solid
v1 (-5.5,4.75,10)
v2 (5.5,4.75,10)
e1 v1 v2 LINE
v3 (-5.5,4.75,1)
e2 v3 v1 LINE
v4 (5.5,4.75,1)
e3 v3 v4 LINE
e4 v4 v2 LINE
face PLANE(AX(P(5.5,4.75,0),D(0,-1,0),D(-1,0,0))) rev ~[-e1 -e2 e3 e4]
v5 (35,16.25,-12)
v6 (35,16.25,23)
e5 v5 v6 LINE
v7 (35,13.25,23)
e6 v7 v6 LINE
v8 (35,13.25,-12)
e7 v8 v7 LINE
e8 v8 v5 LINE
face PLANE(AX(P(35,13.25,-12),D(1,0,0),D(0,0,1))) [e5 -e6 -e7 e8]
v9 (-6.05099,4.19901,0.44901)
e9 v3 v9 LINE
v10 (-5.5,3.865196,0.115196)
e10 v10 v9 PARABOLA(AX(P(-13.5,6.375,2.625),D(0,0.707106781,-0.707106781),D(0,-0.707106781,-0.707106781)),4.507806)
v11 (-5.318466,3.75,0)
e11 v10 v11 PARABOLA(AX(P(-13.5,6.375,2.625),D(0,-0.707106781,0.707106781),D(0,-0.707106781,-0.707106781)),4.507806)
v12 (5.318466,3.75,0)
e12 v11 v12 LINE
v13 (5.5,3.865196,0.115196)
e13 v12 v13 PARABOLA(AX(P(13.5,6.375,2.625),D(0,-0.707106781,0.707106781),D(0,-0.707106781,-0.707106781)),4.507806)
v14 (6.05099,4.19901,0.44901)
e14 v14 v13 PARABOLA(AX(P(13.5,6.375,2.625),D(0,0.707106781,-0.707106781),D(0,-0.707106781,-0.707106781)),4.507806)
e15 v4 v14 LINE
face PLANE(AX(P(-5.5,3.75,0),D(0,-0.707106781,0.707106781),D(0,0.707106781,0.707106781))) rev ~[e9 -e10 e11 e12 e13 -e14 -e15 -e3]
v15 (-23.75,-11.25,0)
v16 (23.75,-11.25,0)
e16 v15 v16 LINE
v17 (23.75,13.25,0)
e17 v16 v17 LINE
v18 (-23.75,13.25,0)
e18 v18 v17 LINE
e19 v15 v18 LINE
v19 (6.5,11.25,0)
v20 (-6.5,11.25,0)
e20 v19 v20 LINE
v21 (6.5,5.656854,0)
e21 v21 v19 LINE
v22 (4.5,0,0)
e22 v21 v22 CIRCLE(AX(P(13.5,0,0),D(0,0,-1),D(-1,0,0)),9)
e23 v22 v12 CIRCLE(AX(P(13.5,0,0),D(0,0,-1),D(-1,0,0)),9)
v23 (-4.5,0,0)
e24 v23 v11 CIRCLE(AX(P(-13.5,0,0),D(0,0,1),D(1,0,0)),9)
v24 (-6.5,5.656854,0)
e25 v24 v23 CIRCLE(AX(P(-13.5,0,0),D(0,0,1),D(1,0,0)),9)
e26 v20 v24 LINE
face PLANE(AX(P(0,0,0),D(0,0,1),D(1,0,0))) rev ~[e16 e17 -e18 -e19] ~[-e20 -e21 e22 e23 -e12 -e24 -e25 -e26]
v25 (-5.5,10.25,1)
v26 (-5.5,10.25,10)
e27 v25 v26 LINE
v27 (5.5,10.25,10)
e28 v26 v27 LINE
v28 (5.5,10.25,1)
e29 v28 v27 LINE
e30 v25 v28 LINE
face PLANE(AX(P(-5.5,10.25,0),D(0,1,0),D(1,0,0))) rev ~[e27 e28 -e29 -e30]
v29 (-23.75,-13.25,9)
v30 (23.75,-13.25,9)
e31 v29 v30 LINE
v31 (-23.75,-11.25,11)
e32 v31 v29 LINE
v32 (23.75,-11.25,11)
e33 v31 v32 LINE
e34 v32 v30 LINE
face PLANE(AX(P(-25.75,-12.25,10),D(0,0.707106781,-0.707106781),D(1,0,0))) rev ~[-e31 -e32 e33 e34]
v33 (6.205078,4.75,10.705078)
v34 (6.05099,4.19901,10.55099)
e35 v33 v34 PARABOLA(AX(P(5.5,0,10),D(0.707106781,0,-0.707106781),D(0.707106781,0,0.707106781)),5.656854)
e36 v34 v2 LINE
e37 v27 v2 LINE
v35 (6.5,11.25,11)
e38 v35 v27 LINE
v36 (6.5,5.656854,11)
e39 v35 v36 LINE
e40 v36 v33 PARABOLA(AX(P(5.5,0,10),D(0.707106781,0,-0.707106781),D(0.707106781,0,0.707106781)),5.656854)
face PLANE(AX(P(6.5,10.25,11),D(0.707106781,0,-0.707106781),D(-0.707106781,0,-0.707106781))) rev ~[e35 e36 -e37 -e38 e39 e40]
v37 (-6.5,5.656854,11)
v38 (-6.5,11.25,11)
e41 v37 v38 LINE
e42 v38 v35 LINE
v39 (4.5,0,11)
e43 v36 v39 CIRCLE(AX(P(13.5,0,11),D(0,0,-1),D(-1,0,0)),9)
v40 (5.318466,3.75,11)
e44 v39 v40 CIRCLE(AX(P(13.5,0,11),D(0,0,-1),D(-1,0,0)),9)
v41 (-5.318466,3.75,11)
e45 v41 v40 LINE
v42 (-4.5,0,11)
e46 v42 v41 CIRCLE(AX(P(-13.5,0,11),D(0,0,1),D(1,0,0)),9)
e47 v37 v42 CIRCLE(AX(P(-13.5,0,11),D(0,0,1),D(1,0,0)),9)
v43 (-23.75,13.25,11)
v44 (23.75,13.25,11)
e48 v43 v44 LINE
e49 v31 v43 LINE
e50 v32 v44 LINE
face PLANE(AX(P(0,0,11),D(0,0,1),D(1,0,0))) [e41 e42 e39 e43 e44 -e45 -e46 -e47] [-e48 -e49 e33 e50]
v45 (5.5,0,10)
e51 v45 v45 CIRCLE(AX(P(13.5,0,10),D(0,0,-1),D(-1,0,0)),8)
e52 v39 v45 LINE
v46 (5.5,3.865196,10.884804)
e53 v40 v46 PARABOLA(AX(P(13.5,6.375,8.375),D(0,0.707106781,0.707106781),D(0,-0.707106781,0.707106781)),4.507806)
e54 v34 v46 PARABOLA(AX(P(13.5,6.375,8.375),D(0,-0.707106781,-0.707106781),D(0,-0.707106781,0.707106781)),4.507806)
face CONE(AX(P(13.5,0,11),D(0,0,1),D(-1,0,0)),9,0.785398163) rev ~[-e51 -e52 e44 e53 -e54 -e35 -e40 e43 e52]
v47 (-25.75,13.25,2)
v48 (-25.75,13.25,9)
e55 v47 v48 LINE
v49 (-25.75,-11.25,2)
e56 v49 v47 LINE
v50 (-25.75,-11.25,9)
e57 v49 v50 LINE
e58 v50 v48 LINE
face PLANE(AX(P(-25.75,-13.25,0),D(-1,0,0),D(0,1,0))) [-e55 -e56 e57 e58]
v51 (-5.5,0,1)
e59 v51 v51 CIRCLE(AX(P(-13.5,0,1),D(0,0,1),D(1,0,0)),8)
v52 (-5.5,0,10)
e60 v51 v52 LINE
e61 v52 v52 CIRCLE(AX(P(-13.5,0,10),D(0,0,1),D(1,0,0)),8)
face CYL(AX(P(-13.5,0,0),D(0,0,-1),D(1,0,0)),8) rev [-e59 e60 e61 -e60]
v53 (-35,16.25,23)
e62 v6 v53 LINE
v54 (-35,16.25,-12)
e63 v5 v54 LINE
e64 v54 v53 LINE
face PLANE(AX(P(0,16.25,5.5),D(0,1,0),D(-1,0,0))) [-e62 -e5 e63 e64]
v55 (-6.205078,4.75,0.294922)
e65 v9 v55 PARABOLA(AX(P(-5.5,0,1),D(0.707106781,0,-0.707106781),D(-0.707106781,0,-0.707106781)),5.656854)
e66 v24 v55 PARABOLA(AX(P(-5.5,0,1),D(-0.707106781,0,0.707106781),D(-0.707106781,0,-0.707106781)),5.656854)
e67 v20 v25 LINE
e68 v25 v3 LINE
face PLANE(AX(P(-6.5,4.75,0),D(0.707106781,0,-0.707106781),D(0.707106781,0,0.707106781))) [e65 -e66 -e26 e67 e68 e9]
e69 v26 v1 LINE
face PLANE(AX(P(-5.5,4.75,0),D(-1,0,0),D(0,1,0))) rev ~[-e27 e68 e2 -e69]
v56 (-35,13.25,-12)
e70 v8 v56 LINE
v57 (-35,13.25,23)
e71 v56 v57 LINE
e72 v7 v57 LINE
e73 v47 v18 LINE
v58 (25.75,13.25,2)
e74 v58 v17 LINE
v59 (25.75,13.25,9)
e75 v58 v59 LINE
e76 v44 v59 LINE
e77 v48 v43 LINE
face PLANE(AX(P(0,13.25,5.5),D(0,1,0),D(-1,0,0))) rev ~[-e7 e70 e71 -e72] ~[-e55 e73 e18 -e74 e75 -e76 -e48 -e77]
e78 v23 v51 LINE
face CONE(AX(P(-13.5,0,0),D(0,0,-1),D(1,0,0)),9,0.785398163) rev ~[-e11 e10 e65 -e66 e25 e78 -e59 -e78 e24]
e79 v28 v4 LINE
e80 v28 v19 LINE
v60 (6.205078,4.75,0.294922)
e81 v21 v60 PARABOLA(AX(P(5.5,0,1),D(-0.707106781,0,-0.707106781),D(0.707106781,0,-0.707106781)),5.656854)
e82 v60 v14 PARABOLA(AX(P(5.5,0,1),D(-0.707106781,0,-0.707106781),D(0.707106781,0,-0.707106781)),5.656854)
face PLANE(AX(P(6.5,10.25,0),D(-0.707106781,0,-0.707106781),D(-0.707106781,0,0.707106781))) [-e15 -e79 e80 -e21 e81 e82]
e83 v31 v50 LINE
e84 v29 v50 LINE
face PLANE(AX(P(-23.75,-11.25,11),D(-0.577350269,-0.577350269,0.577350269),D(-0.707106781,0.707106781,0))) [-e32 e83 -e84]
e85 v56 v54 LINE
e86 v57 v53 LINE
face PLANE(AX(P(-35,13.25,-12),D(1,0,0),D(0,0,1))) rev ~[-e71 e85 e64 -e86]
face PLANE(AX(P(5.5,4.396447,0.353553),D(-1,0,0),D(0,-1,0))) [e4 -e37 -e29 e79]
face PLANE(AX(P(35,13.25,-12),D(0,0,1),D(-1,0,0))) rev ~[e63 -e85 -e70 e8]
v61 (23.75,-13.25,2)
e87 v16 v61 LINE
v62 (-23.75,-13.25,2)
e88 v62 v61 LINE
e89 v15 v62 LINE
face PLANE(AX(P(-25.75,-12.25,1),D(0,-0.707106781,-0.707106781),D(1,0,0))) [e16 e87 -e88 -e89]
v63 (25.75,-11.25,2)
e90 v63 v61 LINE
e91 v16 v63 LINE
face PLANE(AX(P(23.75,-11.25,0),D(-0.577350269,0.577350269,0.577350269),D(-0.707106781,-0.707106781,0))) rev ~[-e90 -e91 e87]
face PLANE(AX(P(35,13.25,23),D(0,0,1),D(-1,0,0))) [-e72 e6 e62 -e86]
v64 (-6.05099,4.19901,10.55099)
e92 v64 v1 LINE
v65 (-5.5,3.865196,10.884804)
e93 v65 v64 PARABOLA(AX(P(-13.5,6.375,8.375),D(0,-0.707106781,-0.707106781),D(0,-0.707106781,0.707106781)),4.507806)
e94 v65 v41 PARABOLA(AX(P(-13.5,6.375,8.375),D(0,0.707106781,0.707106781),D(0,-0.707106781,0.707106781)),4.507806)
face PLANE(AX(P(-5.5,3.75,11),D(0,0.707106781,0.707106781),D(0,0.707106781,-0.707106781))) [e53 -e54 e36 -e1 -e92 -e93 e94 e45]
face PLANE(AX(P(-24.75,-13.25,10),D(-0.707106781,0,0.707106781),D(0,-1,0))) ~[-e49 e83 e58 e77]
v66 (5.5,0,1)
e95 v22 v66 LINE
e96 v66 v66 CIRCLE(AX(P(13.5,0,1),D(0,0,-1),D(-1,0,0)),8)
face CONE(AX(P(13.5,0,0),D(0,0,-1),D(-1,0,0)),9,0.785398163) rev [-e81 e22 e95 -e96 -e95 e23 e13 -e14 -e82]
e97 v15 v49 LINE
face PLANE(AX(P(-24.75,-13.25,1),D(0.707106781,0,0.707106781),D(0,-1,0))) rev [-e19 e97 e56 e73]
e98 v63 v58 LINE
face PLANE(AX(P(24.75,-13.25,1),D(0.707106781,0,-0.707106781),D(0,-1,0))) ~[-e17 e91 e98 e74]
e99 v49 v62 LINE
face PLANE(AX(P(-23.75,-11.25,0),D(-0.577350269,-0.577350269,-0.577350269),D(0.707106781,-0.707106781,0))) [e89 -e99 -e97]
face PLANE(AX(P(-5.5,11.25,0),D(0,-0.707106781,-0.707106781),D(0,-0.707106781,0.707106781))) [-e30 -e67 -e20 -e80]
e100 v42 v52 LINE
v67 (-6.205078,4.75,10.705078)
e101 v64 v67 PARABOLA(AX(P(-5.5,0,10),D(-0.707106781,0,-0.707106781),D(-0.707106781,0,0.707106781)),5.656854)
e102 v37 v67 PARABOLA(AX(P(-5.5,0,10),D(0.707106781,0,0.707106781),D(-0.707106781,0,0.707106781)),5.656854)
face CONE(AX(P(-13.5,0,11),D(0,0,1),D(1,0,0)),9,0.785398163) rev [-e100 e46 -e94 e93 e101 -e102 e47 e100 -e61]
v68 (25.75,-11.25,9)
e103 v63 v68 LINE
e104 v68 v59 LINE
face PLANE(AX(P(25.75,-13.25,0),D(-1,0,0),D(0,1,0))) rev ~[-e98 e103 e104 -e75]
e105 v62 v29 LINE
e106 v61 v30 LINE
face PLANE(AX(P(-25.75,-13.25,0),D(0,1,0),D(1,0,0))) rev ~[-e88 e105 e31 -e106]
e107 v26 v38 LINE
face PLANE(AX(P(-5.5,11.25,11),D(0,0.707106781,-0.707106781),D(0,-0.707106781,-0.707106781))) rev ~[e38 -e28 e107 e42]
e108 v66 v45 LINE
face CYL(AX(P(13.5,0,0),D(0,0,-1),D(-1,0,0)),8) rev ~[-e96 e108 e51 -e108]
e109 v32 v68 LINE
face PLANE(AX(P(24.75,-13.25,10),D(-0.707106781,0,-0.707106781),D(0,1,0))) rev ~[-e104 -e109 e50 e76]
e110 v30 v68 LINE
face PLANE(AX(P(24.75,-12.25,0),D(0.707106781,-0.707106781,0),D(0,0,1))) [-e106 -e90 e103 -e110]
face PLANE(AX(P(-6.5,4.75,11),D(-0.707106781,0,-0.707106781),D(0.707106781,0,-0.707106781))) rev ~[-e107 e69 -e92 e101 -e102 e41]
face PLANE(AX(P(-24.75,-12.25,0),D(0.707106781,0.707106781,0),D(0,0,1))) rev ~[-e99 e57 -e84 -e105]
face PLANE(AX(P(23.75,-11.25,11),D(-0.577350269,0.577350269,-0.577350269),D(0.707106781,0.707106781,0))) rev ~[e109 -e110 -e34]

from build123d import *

# Parameters (mm, degrees)
F0_W         = 51.5
F0_H         = 26.5
F0_R         = 8
F1_DEPTH     = 11
F2_W         = 70
F2_H         = 35
F2_W_2       = 25.75
F2_H_2       = 11
F3_DEPTH     = 3
F4_SIZE      = 2
F5_T1_DEPTH  = 11
F5_T3_DEPTH  = 5.5
F5_T17_DEPTH = 8.071682988
F5_T21_DEPTH = 13.571682988
F5_T28_DEPTH = 13.571682988
F5_T32_DEPTH = 8.071682988
F5_T39_DEPTH = 13.571682988
F5_T43_DEPTH = 8.071682988
F5_T50_DEPTH = 13.571682988
F5_T54_DEPTH = 8.071682988
F5_T61_DEPTH = 8.071682988
F5_T65_DEPTH = 13.571682988
F5_T72_DEPTH = 13.571682988
F5_T76_DEPTH = 8.071682988
F5_T83_DEPTH = 13.571682988
F5_T87_DEPTH = 8.071682988
F5_T94_DEPTH = 13.571682988
F5_T98_DEPTH = 8.071682988


# Not quite as in the source:
# - a fillet or chamfer that OpenCascade refuses, or shapes differently, is made with other operations: its cross-section is extruded or revolved along the edge and cut away or added


with BuildPart() as f1:
    # F0 (on Top) → F1 (new body)
    with BuildSketch(Plane.XY):
        Rectangle(F0_W, F0_H)
        Polygon((5.5, 10.25), (22.75, 10.25), (22.75, -10.25), (-22.75, -10.25), (-22.75, 10.25), (-5.5, 10.25), align=None, mode=Mode.SUBTRACT)
        Polygon((22.75, -10.25), (22.75, 10.25), (5.5, 10.25), (5.5, 4.75), (-5.5, 4.75), (-5.5, 10.25), (-22.75, 10.25), (-22.75, -10.25), align=None)
        with Locations((-13.5, 0)):
            Circle(F0_R, mode=Mode.SUBTRACT)
        with BuildLine():
            ThreePointArc((21.5, 0), (13.5, -8), (5.5, 0))
            ThreePointArc((5.5, 0), (13.5, 8), (21.5, 0))
        make_face(mode=Mode.SUBTRACT)
    extrude(amount=F1_DEPTH)

    # F2 (on face) → F3 (join)
    with BuildSketch(Plane(origin=(0, 13.25, 0), x_dir=(-1, 0, 0), z_dir=(0, 1, 0))):
        with Locations((0, 5.5)):
            Rectangle(F2_W, F2_H)
        Polygon((25.75, 0), (0, 0), (-25.75, 0), (-25.75, 11), (0, 11), (25.75, 11), align=None, mode=Mode.SUBTRACT)
        with Locations((-12.875, 5.5)):
            Rectangle(F2_W_2, F2_H_2)
        with Locations((12.875, 5.5)):
            Rectangle(F2_W_2, F2_H_2)
    extrude(amount=F3_DEPTH)

    # F4
    f4_edges = [f1.edges().sort_by_distance(p)[0] for p in [
        (-25.75, -13.25, 5.5),
        (25.75, -13.25, 5.5),
        (0, -13.25, 11),
        (25.75, 0, 11),
        (-25.75, 0, 11),
        (25.75, 0, 0),
        (-25.75, 0, 0),
        (0, -13.25, 0),
    ]]
    chamfer(f4_edges, length=F4_SIZE)

    # F5: chamfer of 1 on 12 edges, made by hand

    # F5_s2 → F5_t1 (cut)
    with BuildSketch(Plane.YZ.offset(-5.5)):
        Polygon((3.75, 0), (4.75, 1), (4.75, 0), align=None)
        Polygon((11.25, 0), (10.25, 1), (10.25, 0), align=None)
        Polygon((3.75, 11), (4.75, 10), (4.75, 11), align=None)
        Polygon((11.25, 11), (10.25, 10), (10.25, 11), align=None)
    extrude(amount=F5_T1_DEPTH, mode=Mode.SUBTRACT)

    # F5_s4 → F5_t3 (cut)
    with BuildSketch(Plane.XZ.offset(-10.25)):
        Polygon((6.5, 0), (5.5, 1), (5.5, 0), align=None)
        Polygon((-6.5, 0), (-5.5, 1), (-5.5, 0), align=None)
        Polygon((-6.5, 11), (-5.5, 10), (-5.5, 11), align=None)
        Polygon((6.5, 11), (5.5, 10), (5.5, 11), align=None)
    extrude(amount=F5_T3_DEPTH, mode=Mode.SUBTRACT)

    # F5_s5 → F5_t6 (revolve, cut)
    with BuildSketch(Plane.XZ):
        Polygon((-4.5, 0), (-5.5, 1), (-5.5, 0), align=None)
    revolve(axis=Axis((-13.5, 0, 0), (0, 0, 1)), mode=Mode.SUBTRACT)

    # F5_s7 → F5_t8 (revolve, cut)
    with BuildSketch(Plane.XZ):
        Polygon((4.5, 0), (5.5, 1), (5.5, 0), align=None)
    revolve(axis=Axis((13.5, 0, 0), (0, 0, -1)), mode=Mode.SUBTRACT)

    # F5_s9 → F5_t10 (revolve, cut)
    with BuildSketch(Plane.XZ):
        Polygon((-4.5, 11), (-5.5, 10), (-5.5, 11), align=None)
    revolve(axis=Axis((-13.5, 0, 11), (0, 0, 1)), mode=Mode.SUBTRACT)

    # F5_s11 → F5_t12 (revolve, cut)
    with BuildSketch(Plane.XZ):
        Polygon((4.5, 11), (5.5, 10), (5.5, 11), align=None)
    revolve(axis=Axis((13.5, 0, 11), (0, 0, -1)), mode=Mode.SUBTRACT)


with BuildPart() as f5_tool15:
    # F5_s16 → F5_t17 (new body)
    with BuildSketch(Plane.XZ.offset(-10.25)):
        Polygon((6.5, 0), (5.5, 1), (5.5, 0), align=None)
    extrude(amount=F5_T17_DEPTH)

    split(bisect_by=Plane.XZ.offset(-4.75), keep=Keep.TOP)


with BuildPart() as f5_tool19:
    # F5_s20 → F5_t21 (new body)
    with BuildSketch(Plane.YZ.offset(8.071682988)):
        Polygon((3.75, 0), (4.75, 1), (4.75, 0), align=None)
    extrude(amount=-F5_T21_DEPTH)

    split(bisect_by=Plane.YZ.offset(5.5), keep=Keep.TOP)


with BuildPart() as f5_tool15_1:
    add(f5_tool15.part)

    # F5_t23: intersect F5_tool19
    add(f5_tool19.part, mode=Mode.INTERSECT)


with BuildPart() as f1_1:
    add(f1.part)

    # F5_t13: cut F5_tool15
    add(f5_tool15_1.part, mode=Mode.SUBTRACT)


with BuildPart() as f5_tool26:
    # F5_s27 → F5_t28 (new body)
    with BuildSketch(Plane.YZ.offset(5.5)):
        Polygon((3.75, 0), (4.75, 1), (4.75, 0), align=None)
    extrude(amount=-F5_T28_DEPTH)

    split(bisect_by=Plane.YZ.offset(-5.5), keep=Keep.BOTTOM)


with BuildPart() as f5_tool30:
    # F5_s31 → F5_t32 (new body)
    with BuildSketch(Plane.XZ.offset(-2.178317012)):
        Polygon((-6.5, 0), (-5.5, 1), (-5.5, 0), align=None)
    extrude(amount=-F5_T32_DEPTH)

    split(bisect_by=Plane.XZ.offset(-4.75), keep=Keep.TOP)


with BuildPart() as f5_tool26_1:
    add(f5_tool26.part)

    # F5_t34: intersect F5_tool30
    add(f5_tool30.part, mode=Mode.INTERSECT)


with BuildPart() as f1_2:
    add(f1_1.part)

    # F5_t24: cut F5_tool26
    add(f5_tool26_1.part, mode=Mode.SUBTRACT)


with BuildPart() as f5_tool37:
    # F5_s38 → F5_t39 (new body)
    with BuildSketch(Plane.YZ.offset(-5.5)):
        Polygon((11.25, 0), (10.25, 1), (10.25, 0), align=None)
    extrude(amount=F5_T39_DEPTH)

    split(bisect_by=Plane.YZ.offset(5.5), keep=Keep.TOP)


with BuildPart() as f5_tool41:
    # F5_s42 → F5_t43 (new body)
    with BuildSketch(Plane.XZ.offset(-12.821682988)):
        Polygon((6.5, 0), (5.5, 1), (5.5, 0), align=None)
    extrude(amount=F5_T43_DEPTH)

    split(bisect_by=Plane.XZ.offset(-10.25), keep=Keep.BOTTOM)


with BuildPart() as f5_tool37_1:
    add(f5_tool37.part)

    # F5_t45: intersect F5_tool41
    add(f5_tool41.part, mode=Mode.INTERSECT)


with BuildPart() as f1_3:
    add(f1_2.part)

    # F5_t35: cut F5_tool37
    add(f5_tool37_1.part, mode=Mode.SUBTRACT)


with BuildPart() as f5_tool48:
    # F5_s49 → F5_t50 (new body)
    with BuildSketch(Plane.YZ.offset(-8.071682988)):
        Polygon((11.25, 0), (10.25, 1), (10.25, 0), align=None)
    extrude(amount=F5_T50_DEPTH)

    split(bisect_by=Plane.YZ.offset(-5.5), keep=Keep.BOTTOM)


with BuildPart() as f5_tool52:
    # F5_s53 → F5_t54 (new body)
    with BuildSketch(Plane.XZ.offset(-4.75)):
        Polygon((-6.5, 0), (-5.5, 1), (-5.5, 0), align=None)
    extrude(amount=-F5_T54_DEPTH)

    split(bisect_by=Plane.XZ.offset(-10.25), keep=Keep.BOTTOM)


with BuildPart() as f5_tool48_1:
    add(f5_tool48.part)

    # F5_t56: intersect F5_tool52
    add(f5_tool52.part, mode=Mode.INTERSECT)


with BuildPart() as f1_4:
    add(f1_3.part)

    # F5_t46: cut F5_tool48
    add(f5_tool48_1.part, mode=Mode.SUBTRACT)


with BuildPart() as f5_tool59:
    # F5_s60 → F5_t61 (new body)
    with BuildSketch(Plane.XZ.offset(-10.25)):
        Polygon((6.5, 11), (5.5, 10), (5.5, 11), align=None)
    extrude(amount=F5_T61_DEPTH)

    split(bisect_by=Plane.XZ.offset(-4.75), keep=Keep.TOP)


with BuildPart() as f5_tool63:
    # F5_s64 → F5_t65 (new body)
    with BuildSketch(Plane.YZ.offset(8.071682988)):
        Polygon((3.75, 11), (4.75, 10), (4.75, 11), align=None)
    extrude(amount=-F5_T65_DEPTH)

    split(bisect_by=Plane.YZ.offset(5.5), keep=Keep.TOP)


with BuildPart() as f5_tool59_1:
    add(f5_tool59.part)

    # F5_t67: intersect F5_tool63
    add(f5_tool63.part, mode=Mode.INTERSECT)


with BuildPart() as f1_5:
    add(f1_4.part)

    # F5_t57: cut F5_tool59
    add(f5_tool59_1.part, mode=Mode.SUBTRACT)


with BuildPart() as f5_tool70:
    # F5_s71 → F5_t72 (new body)
    with BuildSketch(Plane.YZ.offset(5.5)):
        Polygon((3.75, 11), (4.75, 10), (4.75, 11), align=None)
    extrude(amount=-F5_T72_DEPTH)

    split(bisect_by=Plane.YZ.offset(-5.5), keep=Keep.BOTTOM)


with BuildPart() as f5_tool74:
    # F5_s75 → F5_t76 (new body)
    with BuildSketch(Plane.XZ.offset(-2.178317012)):
        Polygon((-6.5, 11), (-5.5, 10), (-5.5, 11), align=None)
    extrude(amount=-F5_T76_DEPTH)

    split(bisect_by=Plane.XZ.offset(-4.75), keep=Keep.TOP)


with BuildPart() as f5_tool70_1:
    add(f5_tool70.part)

    # F5_t78: intersect F5_tool74
    add(f5_tool74.part, mode=Mode.INTERSECT)


with BuildPart() as f1_6:
    add(f1_5.part)

    # F5_t68: cut F5_tool70
    add(f5_tool70_1.part, mode=Mode.SUBTRACT)


with BuildPart() as f5_tool81:
    # F5_s82 → F5_t83 (new body)
    with BuildSketch(Plane.YZ.offset(-8.071682988)):
        Polygon((11.25, 11), (10.25, 10), (10.25, 11), align=None)
    extrude(amount=F5_T83_DEPTH)

    split(bisect_by=Plane.YZ.offset(-5.5), keep=Keep.BOTTOM)


with BuildPart() as f5_tool85:
    # F5_s86 → F5_t87 (new body)
    with BuildSketch(Plane.XZ.offset(-4.75)):
        Polygon((-6.5, 11), (-5.5, 10), (-5.5, 11), align=None)
    extrude(amount=-F5_T87_DEPTH)

    split(bisect_by=Plane.XZ.offset(-10.25), keep=Keep.BOTTOM)


with BuildPart() as f5_tool81_1:
    add(f5_tool81.part)

    # F5_t89: intersect F5_tool85
    add(f5_tool85.part, mode=Mode.INTERSECT)


with BuildPart() as f1_7:
    add(f1_6.part)

    # F5_t79: cut F5_tool81
    add(f5_tool81_1.part, mode=Mode.SUBTRACT)


with BuildPart() as f5_tool92:
    # F5_s93 → F5_t94 (new body)
    with BuildSketch(Plane.YZ.offset(-5.5)):
        Polygon((11.25, 11), (10.25, 10), (10.25, 11), align=None)
    extrude(amount=F5_T94_DEPTH)

    split(bisect_by=Plane.YZ.offset(5.5), keep=Keep.TOP)


with BuildPart() as f5_tool96:
    # F5_s97 → F5_t98 (new body)
    with BuildSketch(Plane.XZ.offset(-12.821682988)):
        Polygon((6.5, 11), (5.5, 10), (5.5, 11), align=None)
    extrude(amount=F5_T98_DEPTH)

    split(bisect_by=Plane.XZ.offset(-10.25), keep=Keep.BOTTOM)


with BuildPart() as f5_tool92_1:
    add(f5_tool92.part)

    # F5_t100: intersect F5_tool96
    add(f5_tool96.part, mode=Mode.INTERSECT)


with BuildPart() as f1_8:
    add(f1_7.part)

    # F5_t90: cut F5_tool92
    add(f5_tool92_1.part, mode=Mode.SUBTRACT)


solid = f1_8.part
